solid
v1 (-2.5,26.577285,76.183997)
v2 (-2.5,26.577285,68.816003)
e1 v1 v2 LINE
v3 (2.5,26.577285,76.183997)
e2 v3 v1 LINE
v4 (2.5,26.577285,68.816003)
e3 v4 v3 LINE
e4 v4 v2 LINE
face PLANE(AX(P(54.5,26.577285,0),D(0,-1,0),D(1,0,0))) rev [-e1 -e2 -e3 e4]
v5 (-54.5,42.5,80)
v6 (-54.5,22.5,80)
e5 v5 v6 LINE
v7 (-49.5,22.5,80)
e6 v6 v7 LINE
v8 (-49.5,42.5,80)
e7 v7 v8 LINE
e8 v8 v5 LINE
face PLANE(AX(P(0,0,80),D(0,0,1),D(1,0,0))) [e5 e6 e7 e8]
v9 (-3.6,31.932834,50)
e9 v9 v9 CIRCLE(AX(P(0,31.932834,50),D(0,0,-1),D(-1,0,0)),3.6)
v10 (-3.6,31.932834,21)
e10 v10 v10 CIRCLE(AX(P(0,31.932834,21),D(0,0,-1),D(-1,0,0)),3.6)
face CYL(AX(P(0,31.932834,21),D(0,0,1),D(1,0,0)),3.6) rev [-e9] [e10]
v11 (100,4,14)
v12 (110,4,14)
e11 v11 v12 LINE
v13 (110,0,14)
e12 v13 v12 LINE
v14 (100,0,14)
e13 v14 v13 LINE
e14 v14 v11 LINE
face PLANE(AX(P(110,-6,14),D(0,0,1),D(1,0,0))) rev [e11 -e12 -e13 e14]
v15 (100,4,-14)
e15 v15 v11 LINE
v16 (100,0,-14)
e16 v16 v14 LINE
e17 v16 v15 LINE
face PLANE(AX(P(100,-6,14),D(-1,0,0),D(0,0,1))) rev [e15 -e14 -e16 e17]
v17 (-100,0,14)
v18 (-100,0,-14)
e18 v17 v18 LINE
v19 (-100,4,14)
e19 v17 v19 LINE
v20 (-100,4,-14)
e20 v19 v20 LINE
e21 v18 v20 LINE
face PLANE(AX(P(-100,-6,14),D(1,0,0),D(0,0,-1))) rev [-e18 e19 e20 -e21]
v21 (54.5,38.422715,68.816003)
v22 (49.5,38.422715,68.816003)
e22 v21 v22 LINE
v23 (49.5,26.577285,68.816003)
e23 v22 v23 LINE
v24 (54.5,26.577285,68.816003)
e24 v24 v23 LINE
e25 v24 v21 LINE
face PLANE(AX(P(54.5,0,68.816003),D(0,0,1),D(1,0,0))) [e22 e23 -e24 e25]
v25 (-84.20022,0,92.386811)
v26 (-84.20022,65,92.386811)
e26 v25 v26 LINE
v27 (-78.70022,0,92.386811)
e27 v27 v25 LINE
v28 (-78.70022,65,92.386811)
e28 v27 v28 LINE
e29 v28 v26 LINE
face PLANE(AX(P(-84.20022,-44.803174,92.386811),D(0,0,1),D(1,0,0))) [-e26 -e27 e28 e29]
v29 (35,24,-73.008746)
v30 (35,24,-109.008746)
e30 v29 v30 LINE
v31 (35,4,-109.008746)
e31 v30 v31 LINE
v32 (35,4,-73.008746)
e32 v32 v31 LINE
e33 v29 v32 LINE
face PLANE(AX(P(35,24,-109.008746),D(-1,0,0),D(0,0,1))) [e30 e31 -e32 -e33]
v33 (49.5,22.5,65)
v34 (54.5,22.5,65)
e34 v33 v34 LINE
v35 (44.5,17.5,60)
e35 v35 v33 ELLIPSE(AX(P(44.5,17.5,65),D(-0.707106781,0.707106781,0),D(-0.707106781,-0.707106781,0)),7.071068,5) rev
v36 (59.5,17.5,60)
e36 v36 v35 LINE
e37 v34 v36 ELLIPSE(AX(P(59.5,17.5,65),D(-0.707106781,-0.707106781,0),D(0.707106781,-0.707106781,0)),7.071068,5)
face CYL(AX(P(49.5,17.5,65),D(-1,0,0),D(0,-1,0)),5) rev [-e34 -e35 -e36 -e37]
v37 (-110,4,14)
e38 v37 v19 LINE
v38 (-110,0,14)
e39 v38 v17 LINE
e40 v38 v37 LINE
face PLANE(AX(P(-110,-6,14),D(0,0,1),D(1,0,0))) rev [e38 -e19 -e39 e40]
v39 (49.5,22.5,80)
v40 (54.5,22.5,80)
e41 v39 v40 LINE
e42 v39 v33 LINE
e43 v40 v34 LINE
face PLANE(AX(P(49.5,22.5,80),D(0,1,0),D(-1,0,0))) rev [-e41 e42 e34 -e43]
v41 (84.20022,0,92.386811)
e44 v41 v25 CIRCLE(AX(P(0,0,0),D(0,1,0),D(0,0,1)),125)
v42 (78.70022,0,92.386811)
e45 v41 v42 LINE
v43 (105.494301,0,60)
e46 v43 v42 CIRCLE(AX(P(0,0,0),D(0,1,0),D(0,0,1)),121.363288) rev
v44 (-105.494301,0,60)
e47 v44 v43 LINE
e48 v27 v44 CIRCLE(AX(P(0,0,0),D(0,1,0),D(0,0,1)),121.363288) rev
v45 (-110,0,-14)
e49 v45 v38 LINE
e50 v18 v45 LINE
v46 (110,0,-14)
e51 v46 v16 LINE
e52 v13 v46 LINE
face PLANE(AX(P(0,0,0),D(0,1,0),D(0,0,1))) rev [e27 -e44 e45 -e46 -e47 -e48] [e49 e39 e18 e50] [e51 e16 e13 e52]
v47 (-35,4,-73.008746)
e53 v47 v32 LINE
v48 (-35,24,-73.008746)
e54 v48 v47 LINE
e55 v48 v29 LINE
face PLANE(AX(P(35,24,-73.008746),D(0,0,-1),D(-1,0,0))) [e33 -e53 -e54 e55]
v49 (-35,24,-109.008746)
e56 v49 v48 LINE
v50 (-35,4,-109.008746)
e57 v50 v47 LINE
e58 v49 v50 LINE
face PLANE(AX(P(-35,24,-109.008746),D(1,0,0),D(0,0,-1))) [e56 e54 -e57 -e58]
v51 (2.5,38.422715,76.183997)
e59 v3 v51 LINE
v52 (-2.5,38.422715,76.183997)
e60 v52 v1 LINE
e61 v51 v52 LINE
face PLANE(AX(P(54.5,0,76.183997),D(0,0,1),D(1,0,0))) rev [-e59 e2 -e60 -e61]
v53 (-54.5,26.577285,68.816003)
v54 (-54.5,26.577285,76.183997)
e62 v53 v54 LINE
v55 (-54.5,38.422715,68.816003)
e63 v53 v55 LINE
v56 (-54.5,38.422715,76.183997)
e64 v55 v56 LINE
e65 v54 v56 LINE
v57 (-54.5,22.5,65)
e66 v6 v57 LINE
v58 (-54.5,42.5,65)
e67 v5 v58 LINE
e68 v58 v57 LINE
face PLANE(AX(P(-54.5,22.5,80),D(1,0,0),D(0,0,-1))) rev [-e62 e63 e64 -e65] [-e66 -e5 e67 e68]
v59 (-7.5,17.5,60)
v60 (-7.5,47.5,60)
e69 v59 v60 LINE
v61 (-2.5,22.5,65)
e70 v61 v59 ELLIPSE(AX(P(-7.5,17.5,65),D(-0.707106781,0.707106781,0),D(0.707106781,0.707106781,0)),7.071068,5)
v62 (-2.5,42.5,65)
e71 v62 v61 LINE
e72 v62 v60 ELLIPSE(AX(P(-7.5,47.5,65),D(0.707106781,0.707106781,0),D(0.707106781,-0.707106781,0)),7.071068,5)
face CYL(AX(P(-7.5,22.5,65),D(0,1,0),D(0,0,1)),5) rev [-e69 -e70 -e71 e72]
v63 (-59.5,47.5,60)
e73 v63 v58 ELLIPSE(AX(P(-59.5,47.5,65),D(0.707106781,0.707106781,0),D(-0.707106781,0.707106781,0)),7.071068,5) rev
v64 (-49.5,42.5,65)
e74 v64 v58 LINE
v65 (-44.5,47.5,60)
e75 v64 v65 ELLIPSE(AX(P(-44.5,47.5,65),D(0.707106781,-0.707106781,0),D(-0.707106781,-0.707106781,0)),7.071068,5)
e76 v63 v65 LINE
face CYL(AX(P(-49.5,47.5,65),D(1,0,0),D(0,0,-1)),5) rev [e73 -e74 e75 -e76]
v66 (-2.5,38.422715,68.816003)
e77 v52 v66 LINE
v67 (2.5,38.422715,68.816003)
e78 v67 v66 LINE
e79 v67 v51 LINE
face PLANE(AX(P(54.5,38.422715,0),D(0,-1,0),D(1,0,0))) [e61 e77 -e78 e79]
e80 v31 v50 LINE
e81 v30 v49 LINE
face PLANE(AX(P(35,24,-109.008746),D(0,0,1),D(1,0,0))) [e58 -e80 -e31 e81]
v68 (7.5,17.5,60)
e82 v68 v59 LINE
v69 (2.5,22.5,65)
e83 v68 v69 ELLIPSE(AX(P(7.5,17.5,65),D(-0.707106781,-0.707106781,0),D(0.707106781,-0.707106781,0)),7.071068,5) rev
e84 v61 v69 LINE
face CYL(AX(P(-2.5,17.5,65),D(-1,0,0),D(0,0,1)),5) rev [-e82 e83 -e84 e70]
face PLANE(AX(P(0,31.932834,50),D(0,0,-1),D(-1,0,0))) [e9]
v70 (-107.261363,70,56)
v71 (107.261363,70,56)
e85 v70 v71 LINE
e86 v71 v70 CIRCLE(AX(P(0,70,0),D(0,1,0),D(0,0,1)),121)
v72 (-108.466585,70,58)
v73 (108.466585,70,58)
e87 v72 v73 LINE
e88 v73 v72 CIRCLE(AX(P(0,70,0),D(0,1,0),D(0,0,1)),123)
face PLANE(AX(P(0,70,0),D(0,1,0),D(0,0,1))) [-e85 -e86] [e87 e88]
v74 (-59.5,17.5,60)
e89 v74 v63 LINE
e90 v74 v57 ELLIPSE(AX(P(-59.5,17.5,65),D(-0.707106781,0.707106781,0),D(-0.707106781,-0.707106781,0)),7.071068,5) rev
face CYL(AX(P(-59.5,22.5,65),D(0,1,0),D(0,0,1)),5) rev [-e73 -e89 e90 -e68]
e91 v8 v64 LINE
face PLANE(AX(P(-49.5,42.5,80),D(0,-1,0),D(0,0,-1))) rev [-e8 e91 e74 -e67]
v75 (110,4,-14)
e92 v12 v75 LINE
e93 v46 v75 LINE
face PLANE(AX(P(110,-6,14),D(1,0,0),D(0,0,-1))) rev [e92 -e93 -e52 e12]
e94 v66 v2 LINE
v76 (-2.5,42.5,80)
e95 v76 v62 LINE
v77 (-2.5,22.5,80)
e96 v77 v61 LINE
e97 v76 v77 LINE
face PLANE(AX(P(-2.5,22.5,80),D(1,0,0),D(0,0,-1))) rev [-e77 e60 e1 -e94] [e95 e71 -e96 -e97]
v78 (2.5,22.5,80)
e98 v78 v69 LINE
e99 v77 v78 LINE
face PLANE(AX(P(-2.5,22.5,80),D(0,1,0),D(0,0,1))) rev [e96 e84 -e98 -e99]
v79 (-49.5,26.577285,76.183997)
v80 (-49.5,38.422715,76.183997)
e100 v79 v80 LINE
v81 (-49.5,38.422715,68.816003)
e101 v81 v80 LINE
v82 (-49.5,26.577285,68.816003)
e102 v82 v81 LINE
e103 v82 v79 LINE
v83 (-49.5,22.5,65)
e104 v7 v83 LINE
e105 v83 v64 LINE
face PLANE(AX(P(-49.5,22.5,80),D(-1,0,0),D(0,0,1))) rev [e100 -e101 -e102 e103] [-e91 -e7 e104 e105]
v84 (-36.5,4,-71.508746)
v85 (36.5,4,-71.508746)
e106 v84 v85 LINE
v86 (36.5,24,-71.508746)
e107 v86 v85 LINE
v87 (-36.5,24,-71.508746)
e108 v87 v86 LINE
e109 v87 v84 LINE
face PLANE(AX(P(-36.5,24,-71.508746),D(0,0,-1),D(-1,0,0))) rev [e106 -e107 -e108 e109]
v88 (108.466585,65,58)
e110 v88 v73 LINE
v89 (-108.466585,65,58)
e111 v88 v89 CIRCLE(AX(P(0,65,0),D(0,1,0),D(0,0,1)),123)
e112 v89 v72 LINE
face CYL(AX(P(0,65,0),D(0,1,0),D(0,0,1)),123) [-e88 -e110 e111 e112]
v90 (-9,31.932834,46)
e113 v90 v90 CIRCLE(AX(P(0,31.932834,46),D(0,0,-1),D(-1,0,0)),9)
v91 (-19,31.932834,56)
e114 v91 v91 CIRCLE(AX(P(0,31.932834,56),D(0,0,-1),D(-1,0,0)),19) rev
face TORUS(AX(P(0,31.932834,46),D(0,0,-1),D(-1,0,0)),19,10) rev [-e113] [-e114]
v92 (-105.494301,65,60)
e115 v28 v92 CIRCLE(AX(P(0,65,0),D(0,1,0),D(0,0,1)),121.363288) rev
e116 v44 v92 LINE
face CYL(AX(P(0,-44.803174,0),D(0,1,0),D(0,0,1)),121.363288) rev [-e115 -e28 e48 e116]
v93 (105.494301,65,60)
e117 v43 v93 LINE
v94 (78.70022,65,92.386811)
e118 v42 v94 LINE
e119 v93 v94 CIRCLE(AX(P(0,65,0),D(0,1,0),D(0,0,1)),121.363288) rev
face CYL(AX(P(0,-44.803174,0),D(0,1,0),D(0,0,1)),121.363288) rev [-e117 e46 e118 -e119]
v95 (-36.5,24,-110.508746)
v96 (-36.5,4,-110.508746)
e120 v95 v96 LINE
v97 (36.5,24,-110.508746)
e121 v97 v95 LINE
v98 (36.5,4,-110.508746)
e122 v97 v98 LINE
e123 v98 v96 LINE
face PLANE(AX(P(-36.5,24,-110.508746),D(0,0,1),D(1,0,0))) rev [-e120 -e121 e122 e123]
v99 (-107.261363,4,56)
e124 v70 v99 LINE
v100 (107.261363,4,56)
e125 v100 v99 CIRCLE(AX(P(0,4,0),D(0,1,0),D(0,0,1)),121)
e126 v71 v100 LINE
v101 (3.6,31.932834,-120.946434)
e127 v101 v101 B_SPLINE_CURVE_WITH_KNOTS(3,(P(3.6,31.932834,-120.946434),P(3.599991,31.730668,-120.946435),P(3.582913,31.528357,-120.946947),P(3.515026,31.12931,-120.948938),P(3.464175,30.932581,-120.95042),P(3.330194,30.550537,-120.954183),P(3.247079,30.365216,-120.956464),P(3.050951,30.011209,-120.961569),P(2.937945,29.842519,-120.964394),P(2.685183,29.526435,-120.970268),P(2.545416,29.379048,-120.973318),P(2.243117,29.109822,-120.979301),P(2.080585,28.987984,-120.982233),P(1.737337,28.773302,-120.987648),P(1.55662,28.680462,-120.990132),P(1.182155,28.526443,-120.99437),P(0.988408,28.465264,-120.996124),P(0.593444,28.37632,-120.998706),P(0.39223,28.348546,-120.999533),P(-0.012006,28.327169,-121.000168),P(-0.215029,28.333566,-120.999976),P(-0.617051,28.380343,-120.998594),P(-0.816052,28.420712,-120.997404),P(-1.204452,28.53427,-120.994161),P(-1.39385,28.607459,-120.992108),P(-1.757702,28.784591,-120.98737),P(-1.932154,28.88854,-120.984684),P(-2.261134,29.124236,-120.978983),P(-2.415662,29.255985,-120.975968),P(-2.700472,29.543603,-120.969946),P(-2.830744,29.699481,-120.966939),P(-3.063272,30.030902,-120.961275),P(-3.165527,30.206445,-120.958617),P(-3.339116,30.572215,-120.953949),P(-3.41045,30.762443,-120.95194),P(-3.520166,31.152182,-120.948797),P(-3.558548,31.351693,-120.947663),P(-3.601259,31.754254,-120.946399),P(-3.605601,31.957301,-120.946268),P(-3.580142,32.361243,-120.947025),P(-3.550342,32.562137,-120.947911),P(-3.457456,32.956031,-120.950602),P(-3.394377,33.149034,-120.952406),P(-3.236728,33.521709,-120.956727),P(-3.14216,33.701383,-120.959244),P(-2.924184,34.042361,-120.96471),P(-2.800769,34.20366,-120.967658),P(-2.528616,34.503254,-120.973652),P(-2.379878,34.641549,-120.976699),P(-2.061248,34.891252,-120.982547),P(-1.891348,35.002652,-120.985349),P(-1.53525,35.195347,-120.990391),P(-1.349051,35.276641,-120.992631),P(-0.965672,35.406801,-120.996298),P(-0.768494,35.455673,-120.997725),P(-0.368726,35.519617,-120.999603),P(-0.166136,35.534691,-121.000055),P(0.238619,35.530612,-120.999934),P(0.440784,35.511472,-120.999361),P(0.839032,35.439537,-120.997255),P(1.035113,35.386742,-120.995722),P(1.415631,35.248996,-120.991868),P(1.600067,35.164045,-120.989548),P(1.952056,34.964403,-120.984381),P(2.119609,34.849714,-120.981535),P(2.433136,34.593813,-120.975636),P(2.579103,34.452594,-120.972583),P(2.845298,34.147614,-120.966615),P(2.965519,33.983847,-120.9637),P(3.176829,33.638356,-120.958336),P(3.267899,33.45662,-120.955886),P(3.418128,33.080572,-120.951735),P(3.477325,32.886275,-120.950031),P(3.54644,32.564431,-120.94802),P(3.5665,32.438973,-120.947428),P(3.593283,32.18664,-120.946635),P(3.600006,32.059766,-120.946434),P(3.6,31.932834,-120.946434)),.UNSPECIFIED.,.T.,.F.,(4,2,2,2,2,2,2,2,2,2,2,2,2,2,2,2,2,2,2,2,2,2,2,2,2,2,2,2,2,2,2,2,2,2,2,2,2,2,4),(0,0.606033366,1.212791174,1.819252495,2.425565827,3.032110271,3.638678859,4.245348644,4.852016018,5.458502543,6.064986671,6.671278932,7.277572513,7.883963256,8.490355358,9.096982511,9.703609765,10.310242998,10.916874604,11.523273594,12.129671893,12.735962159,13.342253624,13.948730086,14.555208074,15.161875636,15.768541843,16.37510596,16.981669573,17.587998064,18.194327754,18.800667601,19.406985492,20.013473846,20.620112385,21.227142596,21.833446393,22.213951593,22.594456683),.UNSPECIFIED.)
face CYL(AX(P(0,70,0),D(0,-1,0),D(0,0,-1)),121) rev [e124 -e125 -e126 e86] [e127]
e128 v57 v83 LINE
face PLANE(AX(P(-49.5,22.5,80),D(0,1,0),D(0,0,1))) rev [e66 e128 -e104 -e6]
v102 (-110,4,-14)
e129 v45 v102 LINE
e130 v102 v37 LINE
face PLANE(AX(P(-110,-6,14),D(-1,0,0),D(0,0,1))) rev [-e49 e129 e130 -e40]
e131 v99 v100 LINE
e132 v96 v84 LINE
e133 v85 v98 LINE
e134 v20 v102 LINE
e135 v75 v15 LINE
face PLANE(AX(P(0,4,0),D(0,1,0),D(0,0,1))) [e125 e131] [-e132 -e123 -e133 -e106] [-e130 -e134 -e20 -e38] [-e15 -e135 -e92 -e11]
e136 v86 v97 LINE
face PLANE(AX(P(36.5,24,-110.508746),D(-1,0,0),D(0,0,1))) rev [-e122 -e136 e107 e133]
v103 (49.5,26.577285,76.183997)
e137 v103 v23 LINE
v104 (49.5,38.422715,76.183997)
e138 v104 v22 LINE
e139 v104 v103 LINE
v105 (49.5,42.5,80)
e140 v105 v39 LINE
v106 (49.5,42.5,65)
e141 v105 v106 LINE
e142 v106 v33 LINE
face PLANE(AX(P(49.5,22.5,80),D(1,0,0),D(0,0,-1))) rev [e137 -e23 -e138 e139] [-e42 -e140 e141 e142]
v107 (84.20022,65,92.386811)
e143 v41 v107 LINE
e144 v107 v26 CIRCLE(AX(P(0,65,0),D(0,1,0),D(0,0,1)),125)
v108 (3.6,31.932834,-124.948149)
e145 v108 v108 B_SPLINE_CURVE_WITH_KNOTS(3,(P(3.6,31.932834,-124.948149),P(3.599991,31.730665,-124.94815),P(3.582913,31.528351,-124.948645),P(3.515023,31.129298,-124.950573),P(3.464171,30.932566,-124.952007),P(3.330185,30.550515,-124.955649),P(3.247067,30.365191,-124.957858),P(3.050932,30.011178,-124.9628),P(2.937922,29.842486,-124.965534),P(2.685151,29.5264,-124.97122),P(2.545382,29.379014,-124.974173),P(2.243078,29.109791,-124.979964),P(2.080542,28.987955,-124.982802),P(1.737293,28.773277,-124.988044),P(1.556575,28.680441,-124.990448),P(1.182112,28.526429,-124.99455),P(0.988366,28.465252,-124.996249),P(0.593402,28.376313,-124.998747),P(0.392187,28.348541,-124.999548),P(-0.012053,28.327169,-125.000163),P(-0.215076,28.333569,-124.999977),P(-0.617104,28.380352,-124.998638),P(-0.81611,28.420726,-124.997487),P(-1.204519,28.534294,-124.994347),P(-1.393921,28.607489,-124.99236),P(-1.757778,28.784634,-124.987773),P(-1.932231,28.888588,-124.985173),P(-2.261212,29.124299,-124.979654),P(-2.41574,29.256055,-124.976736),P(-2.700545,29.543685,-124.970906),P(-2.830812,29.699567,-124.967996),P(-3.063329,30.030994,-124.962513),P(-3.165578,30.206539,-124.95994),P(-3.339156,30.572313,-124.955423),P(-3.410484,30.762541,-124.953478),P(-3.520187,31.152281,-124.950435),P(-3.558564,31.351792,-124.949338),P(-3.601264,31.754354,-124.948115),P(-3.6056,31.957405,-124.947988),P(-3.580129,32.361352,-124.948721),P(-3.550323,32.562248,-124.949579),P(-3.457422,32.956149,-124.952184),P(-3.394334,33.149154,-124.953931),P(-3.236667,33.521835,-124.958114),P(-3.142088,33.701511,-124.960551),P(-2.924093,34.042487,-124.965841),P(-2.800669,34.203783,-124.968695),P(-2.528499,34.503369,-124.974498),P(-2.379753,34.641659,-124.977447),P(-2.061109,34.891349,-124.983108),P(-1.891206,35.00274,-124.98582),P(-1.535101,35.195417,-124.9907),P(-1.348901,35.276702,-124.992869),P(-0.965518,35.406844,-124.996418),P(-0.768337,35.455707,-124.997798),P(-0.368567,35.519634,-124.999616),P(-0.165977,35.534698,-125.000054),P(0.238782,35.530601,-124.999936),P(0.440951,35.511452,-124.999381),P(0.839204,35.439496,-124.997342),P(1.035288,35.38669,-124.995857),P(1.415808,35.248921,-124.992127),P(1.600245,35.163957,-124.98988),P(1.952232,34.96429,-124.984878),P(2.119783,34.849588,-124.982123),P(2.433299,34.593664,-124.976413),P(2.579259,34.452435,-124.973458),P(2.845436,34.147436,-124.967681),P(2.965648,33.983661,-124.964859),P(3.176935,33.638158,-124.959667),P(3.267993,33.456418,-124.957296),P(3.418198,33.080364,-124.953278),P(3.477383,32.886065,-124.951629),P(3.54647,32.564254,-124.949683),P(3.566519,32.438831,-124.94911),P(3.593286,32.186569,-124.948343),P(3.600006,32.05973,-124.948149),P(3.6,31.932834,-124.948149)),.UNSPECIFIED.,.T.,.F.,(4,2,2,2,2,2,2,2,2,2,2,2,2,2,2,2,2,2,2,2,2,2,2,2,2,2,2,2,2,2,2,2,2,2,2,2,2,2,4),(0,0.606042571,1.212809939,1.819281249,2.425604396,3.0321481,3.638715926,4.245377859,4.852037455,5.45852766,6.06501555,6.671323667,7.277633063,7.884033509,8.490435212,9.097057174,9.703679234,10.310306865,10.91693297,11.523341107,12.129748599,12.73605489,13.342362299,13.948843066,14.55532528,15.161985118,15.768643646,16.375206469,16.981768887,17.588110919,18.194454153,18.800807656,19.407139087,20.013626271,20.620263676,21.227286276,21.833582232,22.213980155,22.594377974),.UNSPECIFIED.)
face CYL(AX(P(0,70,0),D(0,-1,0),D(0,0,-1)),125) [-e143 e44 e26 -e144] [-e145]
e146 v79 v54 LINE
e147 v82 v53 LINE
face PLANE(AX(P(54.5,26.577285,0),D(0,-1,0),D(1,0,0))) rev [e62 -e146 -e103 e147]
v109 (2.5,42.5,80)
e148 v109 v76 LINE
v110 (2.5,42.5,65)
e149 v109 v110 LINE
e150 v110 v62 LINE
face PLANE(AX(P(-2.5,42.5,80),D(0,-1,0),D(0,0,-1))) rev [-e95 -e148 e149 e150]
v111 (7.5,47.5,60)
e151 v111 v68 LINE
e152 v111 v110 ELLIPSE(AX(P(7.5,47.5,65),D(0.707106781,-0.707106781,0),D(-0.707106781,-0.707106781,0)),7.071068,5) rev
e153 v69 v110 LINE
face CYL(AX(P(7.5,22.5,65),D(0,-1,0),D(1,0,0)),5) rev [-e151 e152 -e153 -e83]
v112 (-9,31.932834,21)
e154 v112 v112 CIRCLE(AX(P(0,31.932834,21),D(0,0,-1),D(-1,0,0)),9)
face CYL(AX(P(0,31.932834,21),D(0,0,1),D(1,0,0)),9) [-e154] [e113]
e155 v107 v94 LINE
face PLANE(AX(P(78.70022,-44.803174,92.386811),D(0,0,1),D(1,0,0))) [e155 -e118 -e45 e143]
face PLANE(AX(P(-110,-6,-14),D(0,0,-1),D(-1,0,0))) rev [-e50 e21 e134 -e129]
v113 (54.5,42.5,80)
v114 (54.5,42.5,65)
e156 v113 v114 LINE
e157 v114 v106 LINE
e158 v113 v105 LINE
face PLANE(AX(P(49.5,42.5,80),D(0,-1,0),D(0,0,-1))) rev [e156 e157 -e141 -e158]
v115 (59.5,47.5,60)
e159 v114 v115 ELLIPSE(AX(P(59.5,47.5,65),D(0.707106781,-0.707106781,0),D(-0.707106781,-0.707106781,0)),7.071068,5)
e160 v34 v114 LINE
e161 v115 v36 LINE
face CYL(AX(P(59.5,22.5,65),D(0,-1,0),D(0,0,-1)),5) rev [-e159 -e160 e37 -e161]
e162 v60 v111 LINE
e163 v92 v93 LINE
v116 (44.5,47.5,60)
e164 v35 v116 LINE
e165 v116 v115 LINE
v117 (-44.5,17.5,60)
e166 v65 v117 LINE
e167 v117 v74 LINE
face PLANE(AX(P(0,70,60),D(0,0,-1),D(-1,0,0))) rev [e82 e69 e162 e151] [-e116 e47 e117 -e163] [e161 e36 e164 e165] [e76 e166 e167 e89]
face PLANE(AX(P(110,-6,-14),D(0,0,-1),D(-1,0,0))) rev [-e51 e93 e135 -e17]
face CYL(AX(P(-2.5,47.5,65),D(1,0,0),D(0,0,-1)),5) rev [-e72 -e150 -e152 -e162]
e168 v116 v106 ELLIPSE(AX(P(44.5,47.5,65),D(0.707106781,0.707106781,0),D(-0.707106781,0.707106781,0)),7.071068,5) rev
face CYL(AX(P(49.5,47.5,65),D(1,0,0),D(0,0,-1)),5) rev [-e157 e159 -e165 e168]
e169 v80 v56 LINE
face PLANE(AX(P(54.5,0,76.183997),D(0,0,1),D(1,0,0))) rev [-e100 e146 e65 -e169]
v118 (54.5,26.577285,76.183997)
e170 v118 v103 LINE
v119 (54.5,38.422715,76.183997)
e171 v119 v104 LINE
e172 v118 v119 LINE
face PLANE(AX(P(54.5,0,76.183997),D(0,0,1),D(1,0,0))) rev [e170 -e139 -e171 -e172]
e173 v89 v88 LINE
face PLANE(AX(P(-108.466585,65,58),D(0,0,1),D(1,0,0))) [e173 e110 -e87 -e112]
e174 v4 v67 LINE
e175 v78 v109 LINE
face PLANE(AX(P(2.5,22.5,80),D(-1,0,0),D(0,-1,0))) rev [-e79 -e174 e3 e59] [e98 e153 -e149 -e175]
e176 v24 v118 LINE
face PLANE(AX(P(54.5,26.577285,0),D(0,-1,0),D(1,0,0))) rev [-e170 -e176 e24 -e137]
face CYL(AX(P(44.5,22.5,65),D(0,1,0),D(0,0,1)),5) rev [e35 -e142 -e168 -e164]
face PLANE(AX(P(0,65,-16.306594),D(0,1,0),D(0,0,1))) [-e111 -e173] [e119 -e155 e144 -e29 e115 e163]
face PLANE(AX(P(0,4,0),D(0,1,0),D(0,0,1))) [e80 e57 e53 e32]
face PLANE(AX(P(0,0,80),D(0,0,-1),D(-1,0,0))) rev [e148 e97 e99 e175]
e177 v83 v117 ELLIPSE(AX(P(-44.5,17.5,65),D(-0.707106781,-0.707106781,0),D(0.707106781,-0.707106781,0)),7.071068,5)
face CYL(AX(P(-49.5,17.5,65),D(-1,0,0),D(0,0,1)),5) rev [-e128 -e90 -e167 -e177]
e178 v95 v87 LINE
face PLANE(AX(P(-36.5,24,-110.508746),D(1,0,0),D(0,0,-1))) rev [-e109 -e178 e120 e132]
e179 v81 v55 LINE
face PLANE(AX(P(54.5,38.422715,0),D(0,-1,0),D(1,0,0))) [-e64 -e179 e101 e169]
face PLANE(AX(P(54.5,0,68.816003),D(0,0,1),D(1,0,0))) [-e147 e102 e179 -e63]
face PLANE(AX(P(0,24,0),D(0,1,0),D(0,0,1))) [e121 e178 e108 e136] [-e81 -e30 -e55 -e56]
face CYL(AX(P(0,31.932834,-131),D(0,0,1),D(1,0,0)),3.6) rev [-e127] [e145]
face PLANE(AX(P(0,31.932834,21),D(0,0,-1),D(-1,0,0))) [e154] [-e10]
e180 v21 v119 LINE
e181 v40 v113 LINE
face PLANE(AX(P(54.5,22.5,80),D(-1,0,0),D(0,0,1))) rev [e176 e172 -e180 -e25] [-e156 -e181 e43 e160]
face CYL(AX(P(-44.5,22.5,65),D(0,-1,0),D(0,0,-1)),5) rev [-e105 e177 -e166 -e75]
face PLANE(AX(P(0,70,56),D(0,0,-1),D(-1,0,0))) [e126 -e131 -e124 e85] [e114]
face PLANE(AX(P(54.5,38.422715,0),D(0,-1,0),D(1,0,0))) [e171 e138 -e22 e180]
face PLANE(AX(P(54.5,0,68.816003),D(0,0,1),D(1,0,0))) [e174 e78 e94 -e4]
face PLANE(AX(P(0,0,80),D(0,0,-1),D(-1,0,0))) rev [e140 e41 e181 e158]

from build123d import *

# Parameters (mm, degrees)
RESSALTO_EXTRUS_O1_DEPTH   = 70
RESSALTO_EXTRUS_O4_START   = -70
RESSALTO_EXTRUS_O4_DEPTH   = 70
CASCA1_START               = 4
CASCA1_DEPTH               = 66
ESBO_O17_W                 = 10
ESBO_O17_H                 = 28
CORTE_EXTRUS_O2_DEPTH      = 10
CORTE_EXTRUS_O6_DEPTH      = 4
CORTE_EXTRUS_O6_DEPTH_BACK = 5
ESBO_O23_OUTSIDE_W         = 319.722
ESBO_O23_OUTSIDE_H         = 287.109
ESBO_O27_W                 = 5
ESBO_O27_H                 = 20
RESSALTO_EXTRUS_O5_DEPTH   = 20
FILETE2_R                  = 5
CORTE_EXTRUS_O7_DEPTH      = 104
CORTE_EXTRUS_O7_DEPTH_BACK = 5
ESBO_O28_W                 = 7.367994206
ESBO_O28_H                 = 11.845430552
ESBO_O32_R                 = 3.6
CORTE_EXTRUS_O8_DEPTH      = 187
ESBO_O32_3_R               = 9
ESBO_O32_3_R_2             = 3.6
RESSALTO_EXTRUS_O6_DEPTH   = 35
ESBO_O32_4_R               = 3.6
RESSALTO_EXTRUS_O7_DEPTH   = 6
FILETE3_R                  = 10
ESBO_O24_W                 = 73
ESBO_O24_H                 = 39
ESBO_O24_W_2               = 70
ESBO_O24_H_2               = 36
RESSALTO_EXTRUS_O8_DEPTH   = 20


# Read off the part's stored shape, not the designer's step: Casca1
with BuildPart() as part:
    # Esboço1 → Ressalto-extrusão1 (new body)
    with BuildSketch(Plane(origin=(0, 0, 0), x_dir=(1, 0, 0), z_dir=(0, 1, 0))):
        with BuildLine():
            ThreePointArc((125, 0), (-30.965140685, 121.103922572), (-109.658560997, -60))
            Line((-109.658560997, -60), (109.658560997, -60))
            ThreePointArc((109.658560997, -60), (121.103922572, -30.965140685), (125, 0))
        make_face()
    extrude(amount=RESSALTO_EXTRUS_O1_DEPTH)

    # Esboço5 → Ressalto-extrusão4 (add)
    with BuildSketch(Plane(origin=(0, 70, 0), x_dir=(1, 0, 0), z_dir=(0, 1, 0)).offset(RESSALTO_EXTRUS_O4_START)):
        with BuildLine():
            Line((-84.200220254, -92.386811338), (-78.700220254, -92.386811338))
            ThreePointArc((-78.700220254, -92.386811338), (-93.51006265, -77.362237302), (-105.49430116, -60))
            Line((-105.49430116, -60), (-109.658560997, -60))
            ThreePointArc((-109.658560997, -60), (-98.272748787, -77.249380877), (-84.200220254, -92.386811338))
        make_face()
        with BuildLine():
            Line((78.700220254, -92.386811338), (84.200220254, -92.386811338))
            ThreePointArc((84.200220254, -92.386811338), (98.272748787, -77.249380877), (109.658560997, -60))
            Line((109.658560997, -60), (105.49430116, -60))
            ThreePointArc((105.49430116, -60), (93.51006265, -77.362237302), (78.700220254, -92.386811338))
        make_face()
    extrude(amount=RESSALTO_EXTRUS_O4_DEPTH)

    # Casca1 outline → Casca1 (cut)
    with BuildSketch(Plane(origin=(0, 0, 0), x_dir=(1, 0, 0), z_dir=(0, 1, 0)).offset(CASCA1_START)):
        with BuildLine():
            Line((-107.261363034, -56), (107.261363034, -56))
            ThreePointArc((107.261363034, -56), (0, 121), (-107.261363034, -56))
        make_face()
    extrude(amount=CASCA1_DEPTH, mode=Mode.SUBTRACT)

    # Esboço17 → Corte-extrusão2 (cut)
    with BuildSketch(Plane(origin=(0, 4, 0), x_dir=(1, 0, 0), z_dir=(0, 1, 0))):
        with Locations((-105, 0)):
            Rectangle(ESBO_O17_W, ESBO_O17_H)
        with Locations((105, 0)):
            Rectangle(ESBO_O17_W, ESBO_O17_H)
    extrude(amount=-CORTE_EXTRUS_O2_DEPTH, mode=Mode.SUBTRACT)

    # Esboço23 outside → Corte-extrusão6 (cut, two sides: drawn at the far end of the back side and taken through both)
    with BuildSketch(Plane(origin=(0, 70, 0), x_dir=(1, 0, 0), z_dir=(0, 1, 0)).offset(-CORTE_EXTRUS_O6_DEPTH_BACK)):
        with Locations((0, 16.3065)):
            Rectangle(ESBO_O23_OUTSIDE_W, ESBO_O23_OUTSIDE_H)
        with BuildLine():
            Line((-108.466584716, -58), (108.466584716, -58))
            ThreePointArc((108.466584716, -58), (0, 123), (-108.466584716, -58))
        make_face(mode=Mode.SUBTRACT)
    extrude(amount=CORTE_EXTRUS_O6_DEPTH + CORTE_EXTRUS_O6_DEPTH_BACK, mode=Mode.SUBTRACT)

    # Esboço27 → Ressalto-extrusão5 (add)
    with BuildSketch(Plane.XY.offset(60)):
        with Locations((-52, 32.5)):
            Rectangle(ESBO_O27_W, ESBO_O27_H)
        with Locations((52, 32.5)):
            Rectangle(ESBO_O27_W, ESBO_O27_H)
        with Locations((0, 32.5)):
            Rectangle(ESBO_O27_W, ESBO_O27_H)
    extrude(amount=RESSALTO_EXTRUS_O5_DEPTH)

    # Filete2
    filete2_edges = [part.edges().sort_by_distance(p)[0] for p in [
        (-54.5, 32.5, 60),
        (-52, 22.5, 60),
        (-49.5, 32.5, 60),
        (-52, 42.5, 60),
        (49.5, 32.5, 60),
        (52, 22.5, 60),
        (54.5, 32.5, 60),
        (52, 42.5, 60),
        (-2.5, 32.5, 60),
        (0, 22.5, 60),
        (2.5, 32.5, 60),
        (0, 42.5, 60),
    ]]
    fillet(filete2_edges, radius=FILETE2_R)

    # Esboço28 → Corte-extrusão7 (cut, two sides: drawn at the far end of the back side and taken through both)
    with BuildSketch(Plane(origin=(-49.5, 0, 0), x_dir=(0, 0, -1), z_dir=(1, 0, 0)).offset(-CORTE_EXTRUS_O7_DEPTH_BACK)):
        with Locations((-72.5, 32.5)):
            Rectangle(ESBO_O28_W, ESBO_O28_H)
    extrude(amount=CORTE_EXTRUS_O7_DEPTH + CORTE_EXTRUS_O7_DEPTH_BACK, mode=Mode.SUBTRACT)

    # Esboço32 → Corte-extrusão8 (cut)
    with BuildSketch(Plane(origin=(0, 0, 56), x_dir=(-1, 0, 0), z_dir=(0, 0, -1))):
        with Locations(Location((0, 31.932833776, 0), (0, 0, 180))):
            Circle(ESBO_O32_R)
    extrude(amount=CORTE_EXTRUS_O8_DEPTH, mode=Mode.SUBTRACT)

    # Esboço32<3> → Ressalto-extrusão6 (add)
    with BuildSketch(Plane(origin=(0, 0, 56), x_dir=(-1, 0, 0), z_dir=(0, 0, -1))):
        with Locations((0, 31.932833776)):
            Circle(ESBO_O32_3_R)
        with Locations(Location((0, 31.932833776, 0), (0, 0, 180))):
            Circle(ESBO_O32_3_R_2, mode=Mode.SUBTRACT)
    extrude(amount=RESSALTO_EXTRUS_O6_DEPTH)

    # Esboço32<4> → Ressalto-extrusão7 (add)
    with BuildSketch(Plane(origin=(0, 0, 56), x_dir=(-1, 0, 0), z_dir=(0, 0, -1))):
        with Locations(Location((0, 31.932833776, 0), (0, 0, 180))):
            Circle(ESBO_O32_4_R)
    extrude(amount=RESSALTO_EXTRUS_O7_DEPTH)

    # Filete3
    filete3_edges = [part.edges().sort_by_distance(p)[0] for p in [
        (9, 31.932833776, 56),
    ]]
    fillet(filete3_edges, radius=FILETE3_R)

    # Esboço24 → Ressalto-extrusão8 (add)
    with BuildSketch(Plane(origin=(0, 4, 0), x_dir=(1, 0, 0), z_dir=(0, 1, 0))):
        with Locations((0, 91.008746076)):
            Rectangle(ESBO_O24_W, ESBO_O24_H)
        with Locations((0, 91.008746076)):
            Rectangle(ESBO_O24_W_2, ESBO_O24_H_2, mode=Mode.SUBTRACT)
    extrude(amount=RESSALTO_EXTRUS_O8_DEPTH)


solid = part.part
